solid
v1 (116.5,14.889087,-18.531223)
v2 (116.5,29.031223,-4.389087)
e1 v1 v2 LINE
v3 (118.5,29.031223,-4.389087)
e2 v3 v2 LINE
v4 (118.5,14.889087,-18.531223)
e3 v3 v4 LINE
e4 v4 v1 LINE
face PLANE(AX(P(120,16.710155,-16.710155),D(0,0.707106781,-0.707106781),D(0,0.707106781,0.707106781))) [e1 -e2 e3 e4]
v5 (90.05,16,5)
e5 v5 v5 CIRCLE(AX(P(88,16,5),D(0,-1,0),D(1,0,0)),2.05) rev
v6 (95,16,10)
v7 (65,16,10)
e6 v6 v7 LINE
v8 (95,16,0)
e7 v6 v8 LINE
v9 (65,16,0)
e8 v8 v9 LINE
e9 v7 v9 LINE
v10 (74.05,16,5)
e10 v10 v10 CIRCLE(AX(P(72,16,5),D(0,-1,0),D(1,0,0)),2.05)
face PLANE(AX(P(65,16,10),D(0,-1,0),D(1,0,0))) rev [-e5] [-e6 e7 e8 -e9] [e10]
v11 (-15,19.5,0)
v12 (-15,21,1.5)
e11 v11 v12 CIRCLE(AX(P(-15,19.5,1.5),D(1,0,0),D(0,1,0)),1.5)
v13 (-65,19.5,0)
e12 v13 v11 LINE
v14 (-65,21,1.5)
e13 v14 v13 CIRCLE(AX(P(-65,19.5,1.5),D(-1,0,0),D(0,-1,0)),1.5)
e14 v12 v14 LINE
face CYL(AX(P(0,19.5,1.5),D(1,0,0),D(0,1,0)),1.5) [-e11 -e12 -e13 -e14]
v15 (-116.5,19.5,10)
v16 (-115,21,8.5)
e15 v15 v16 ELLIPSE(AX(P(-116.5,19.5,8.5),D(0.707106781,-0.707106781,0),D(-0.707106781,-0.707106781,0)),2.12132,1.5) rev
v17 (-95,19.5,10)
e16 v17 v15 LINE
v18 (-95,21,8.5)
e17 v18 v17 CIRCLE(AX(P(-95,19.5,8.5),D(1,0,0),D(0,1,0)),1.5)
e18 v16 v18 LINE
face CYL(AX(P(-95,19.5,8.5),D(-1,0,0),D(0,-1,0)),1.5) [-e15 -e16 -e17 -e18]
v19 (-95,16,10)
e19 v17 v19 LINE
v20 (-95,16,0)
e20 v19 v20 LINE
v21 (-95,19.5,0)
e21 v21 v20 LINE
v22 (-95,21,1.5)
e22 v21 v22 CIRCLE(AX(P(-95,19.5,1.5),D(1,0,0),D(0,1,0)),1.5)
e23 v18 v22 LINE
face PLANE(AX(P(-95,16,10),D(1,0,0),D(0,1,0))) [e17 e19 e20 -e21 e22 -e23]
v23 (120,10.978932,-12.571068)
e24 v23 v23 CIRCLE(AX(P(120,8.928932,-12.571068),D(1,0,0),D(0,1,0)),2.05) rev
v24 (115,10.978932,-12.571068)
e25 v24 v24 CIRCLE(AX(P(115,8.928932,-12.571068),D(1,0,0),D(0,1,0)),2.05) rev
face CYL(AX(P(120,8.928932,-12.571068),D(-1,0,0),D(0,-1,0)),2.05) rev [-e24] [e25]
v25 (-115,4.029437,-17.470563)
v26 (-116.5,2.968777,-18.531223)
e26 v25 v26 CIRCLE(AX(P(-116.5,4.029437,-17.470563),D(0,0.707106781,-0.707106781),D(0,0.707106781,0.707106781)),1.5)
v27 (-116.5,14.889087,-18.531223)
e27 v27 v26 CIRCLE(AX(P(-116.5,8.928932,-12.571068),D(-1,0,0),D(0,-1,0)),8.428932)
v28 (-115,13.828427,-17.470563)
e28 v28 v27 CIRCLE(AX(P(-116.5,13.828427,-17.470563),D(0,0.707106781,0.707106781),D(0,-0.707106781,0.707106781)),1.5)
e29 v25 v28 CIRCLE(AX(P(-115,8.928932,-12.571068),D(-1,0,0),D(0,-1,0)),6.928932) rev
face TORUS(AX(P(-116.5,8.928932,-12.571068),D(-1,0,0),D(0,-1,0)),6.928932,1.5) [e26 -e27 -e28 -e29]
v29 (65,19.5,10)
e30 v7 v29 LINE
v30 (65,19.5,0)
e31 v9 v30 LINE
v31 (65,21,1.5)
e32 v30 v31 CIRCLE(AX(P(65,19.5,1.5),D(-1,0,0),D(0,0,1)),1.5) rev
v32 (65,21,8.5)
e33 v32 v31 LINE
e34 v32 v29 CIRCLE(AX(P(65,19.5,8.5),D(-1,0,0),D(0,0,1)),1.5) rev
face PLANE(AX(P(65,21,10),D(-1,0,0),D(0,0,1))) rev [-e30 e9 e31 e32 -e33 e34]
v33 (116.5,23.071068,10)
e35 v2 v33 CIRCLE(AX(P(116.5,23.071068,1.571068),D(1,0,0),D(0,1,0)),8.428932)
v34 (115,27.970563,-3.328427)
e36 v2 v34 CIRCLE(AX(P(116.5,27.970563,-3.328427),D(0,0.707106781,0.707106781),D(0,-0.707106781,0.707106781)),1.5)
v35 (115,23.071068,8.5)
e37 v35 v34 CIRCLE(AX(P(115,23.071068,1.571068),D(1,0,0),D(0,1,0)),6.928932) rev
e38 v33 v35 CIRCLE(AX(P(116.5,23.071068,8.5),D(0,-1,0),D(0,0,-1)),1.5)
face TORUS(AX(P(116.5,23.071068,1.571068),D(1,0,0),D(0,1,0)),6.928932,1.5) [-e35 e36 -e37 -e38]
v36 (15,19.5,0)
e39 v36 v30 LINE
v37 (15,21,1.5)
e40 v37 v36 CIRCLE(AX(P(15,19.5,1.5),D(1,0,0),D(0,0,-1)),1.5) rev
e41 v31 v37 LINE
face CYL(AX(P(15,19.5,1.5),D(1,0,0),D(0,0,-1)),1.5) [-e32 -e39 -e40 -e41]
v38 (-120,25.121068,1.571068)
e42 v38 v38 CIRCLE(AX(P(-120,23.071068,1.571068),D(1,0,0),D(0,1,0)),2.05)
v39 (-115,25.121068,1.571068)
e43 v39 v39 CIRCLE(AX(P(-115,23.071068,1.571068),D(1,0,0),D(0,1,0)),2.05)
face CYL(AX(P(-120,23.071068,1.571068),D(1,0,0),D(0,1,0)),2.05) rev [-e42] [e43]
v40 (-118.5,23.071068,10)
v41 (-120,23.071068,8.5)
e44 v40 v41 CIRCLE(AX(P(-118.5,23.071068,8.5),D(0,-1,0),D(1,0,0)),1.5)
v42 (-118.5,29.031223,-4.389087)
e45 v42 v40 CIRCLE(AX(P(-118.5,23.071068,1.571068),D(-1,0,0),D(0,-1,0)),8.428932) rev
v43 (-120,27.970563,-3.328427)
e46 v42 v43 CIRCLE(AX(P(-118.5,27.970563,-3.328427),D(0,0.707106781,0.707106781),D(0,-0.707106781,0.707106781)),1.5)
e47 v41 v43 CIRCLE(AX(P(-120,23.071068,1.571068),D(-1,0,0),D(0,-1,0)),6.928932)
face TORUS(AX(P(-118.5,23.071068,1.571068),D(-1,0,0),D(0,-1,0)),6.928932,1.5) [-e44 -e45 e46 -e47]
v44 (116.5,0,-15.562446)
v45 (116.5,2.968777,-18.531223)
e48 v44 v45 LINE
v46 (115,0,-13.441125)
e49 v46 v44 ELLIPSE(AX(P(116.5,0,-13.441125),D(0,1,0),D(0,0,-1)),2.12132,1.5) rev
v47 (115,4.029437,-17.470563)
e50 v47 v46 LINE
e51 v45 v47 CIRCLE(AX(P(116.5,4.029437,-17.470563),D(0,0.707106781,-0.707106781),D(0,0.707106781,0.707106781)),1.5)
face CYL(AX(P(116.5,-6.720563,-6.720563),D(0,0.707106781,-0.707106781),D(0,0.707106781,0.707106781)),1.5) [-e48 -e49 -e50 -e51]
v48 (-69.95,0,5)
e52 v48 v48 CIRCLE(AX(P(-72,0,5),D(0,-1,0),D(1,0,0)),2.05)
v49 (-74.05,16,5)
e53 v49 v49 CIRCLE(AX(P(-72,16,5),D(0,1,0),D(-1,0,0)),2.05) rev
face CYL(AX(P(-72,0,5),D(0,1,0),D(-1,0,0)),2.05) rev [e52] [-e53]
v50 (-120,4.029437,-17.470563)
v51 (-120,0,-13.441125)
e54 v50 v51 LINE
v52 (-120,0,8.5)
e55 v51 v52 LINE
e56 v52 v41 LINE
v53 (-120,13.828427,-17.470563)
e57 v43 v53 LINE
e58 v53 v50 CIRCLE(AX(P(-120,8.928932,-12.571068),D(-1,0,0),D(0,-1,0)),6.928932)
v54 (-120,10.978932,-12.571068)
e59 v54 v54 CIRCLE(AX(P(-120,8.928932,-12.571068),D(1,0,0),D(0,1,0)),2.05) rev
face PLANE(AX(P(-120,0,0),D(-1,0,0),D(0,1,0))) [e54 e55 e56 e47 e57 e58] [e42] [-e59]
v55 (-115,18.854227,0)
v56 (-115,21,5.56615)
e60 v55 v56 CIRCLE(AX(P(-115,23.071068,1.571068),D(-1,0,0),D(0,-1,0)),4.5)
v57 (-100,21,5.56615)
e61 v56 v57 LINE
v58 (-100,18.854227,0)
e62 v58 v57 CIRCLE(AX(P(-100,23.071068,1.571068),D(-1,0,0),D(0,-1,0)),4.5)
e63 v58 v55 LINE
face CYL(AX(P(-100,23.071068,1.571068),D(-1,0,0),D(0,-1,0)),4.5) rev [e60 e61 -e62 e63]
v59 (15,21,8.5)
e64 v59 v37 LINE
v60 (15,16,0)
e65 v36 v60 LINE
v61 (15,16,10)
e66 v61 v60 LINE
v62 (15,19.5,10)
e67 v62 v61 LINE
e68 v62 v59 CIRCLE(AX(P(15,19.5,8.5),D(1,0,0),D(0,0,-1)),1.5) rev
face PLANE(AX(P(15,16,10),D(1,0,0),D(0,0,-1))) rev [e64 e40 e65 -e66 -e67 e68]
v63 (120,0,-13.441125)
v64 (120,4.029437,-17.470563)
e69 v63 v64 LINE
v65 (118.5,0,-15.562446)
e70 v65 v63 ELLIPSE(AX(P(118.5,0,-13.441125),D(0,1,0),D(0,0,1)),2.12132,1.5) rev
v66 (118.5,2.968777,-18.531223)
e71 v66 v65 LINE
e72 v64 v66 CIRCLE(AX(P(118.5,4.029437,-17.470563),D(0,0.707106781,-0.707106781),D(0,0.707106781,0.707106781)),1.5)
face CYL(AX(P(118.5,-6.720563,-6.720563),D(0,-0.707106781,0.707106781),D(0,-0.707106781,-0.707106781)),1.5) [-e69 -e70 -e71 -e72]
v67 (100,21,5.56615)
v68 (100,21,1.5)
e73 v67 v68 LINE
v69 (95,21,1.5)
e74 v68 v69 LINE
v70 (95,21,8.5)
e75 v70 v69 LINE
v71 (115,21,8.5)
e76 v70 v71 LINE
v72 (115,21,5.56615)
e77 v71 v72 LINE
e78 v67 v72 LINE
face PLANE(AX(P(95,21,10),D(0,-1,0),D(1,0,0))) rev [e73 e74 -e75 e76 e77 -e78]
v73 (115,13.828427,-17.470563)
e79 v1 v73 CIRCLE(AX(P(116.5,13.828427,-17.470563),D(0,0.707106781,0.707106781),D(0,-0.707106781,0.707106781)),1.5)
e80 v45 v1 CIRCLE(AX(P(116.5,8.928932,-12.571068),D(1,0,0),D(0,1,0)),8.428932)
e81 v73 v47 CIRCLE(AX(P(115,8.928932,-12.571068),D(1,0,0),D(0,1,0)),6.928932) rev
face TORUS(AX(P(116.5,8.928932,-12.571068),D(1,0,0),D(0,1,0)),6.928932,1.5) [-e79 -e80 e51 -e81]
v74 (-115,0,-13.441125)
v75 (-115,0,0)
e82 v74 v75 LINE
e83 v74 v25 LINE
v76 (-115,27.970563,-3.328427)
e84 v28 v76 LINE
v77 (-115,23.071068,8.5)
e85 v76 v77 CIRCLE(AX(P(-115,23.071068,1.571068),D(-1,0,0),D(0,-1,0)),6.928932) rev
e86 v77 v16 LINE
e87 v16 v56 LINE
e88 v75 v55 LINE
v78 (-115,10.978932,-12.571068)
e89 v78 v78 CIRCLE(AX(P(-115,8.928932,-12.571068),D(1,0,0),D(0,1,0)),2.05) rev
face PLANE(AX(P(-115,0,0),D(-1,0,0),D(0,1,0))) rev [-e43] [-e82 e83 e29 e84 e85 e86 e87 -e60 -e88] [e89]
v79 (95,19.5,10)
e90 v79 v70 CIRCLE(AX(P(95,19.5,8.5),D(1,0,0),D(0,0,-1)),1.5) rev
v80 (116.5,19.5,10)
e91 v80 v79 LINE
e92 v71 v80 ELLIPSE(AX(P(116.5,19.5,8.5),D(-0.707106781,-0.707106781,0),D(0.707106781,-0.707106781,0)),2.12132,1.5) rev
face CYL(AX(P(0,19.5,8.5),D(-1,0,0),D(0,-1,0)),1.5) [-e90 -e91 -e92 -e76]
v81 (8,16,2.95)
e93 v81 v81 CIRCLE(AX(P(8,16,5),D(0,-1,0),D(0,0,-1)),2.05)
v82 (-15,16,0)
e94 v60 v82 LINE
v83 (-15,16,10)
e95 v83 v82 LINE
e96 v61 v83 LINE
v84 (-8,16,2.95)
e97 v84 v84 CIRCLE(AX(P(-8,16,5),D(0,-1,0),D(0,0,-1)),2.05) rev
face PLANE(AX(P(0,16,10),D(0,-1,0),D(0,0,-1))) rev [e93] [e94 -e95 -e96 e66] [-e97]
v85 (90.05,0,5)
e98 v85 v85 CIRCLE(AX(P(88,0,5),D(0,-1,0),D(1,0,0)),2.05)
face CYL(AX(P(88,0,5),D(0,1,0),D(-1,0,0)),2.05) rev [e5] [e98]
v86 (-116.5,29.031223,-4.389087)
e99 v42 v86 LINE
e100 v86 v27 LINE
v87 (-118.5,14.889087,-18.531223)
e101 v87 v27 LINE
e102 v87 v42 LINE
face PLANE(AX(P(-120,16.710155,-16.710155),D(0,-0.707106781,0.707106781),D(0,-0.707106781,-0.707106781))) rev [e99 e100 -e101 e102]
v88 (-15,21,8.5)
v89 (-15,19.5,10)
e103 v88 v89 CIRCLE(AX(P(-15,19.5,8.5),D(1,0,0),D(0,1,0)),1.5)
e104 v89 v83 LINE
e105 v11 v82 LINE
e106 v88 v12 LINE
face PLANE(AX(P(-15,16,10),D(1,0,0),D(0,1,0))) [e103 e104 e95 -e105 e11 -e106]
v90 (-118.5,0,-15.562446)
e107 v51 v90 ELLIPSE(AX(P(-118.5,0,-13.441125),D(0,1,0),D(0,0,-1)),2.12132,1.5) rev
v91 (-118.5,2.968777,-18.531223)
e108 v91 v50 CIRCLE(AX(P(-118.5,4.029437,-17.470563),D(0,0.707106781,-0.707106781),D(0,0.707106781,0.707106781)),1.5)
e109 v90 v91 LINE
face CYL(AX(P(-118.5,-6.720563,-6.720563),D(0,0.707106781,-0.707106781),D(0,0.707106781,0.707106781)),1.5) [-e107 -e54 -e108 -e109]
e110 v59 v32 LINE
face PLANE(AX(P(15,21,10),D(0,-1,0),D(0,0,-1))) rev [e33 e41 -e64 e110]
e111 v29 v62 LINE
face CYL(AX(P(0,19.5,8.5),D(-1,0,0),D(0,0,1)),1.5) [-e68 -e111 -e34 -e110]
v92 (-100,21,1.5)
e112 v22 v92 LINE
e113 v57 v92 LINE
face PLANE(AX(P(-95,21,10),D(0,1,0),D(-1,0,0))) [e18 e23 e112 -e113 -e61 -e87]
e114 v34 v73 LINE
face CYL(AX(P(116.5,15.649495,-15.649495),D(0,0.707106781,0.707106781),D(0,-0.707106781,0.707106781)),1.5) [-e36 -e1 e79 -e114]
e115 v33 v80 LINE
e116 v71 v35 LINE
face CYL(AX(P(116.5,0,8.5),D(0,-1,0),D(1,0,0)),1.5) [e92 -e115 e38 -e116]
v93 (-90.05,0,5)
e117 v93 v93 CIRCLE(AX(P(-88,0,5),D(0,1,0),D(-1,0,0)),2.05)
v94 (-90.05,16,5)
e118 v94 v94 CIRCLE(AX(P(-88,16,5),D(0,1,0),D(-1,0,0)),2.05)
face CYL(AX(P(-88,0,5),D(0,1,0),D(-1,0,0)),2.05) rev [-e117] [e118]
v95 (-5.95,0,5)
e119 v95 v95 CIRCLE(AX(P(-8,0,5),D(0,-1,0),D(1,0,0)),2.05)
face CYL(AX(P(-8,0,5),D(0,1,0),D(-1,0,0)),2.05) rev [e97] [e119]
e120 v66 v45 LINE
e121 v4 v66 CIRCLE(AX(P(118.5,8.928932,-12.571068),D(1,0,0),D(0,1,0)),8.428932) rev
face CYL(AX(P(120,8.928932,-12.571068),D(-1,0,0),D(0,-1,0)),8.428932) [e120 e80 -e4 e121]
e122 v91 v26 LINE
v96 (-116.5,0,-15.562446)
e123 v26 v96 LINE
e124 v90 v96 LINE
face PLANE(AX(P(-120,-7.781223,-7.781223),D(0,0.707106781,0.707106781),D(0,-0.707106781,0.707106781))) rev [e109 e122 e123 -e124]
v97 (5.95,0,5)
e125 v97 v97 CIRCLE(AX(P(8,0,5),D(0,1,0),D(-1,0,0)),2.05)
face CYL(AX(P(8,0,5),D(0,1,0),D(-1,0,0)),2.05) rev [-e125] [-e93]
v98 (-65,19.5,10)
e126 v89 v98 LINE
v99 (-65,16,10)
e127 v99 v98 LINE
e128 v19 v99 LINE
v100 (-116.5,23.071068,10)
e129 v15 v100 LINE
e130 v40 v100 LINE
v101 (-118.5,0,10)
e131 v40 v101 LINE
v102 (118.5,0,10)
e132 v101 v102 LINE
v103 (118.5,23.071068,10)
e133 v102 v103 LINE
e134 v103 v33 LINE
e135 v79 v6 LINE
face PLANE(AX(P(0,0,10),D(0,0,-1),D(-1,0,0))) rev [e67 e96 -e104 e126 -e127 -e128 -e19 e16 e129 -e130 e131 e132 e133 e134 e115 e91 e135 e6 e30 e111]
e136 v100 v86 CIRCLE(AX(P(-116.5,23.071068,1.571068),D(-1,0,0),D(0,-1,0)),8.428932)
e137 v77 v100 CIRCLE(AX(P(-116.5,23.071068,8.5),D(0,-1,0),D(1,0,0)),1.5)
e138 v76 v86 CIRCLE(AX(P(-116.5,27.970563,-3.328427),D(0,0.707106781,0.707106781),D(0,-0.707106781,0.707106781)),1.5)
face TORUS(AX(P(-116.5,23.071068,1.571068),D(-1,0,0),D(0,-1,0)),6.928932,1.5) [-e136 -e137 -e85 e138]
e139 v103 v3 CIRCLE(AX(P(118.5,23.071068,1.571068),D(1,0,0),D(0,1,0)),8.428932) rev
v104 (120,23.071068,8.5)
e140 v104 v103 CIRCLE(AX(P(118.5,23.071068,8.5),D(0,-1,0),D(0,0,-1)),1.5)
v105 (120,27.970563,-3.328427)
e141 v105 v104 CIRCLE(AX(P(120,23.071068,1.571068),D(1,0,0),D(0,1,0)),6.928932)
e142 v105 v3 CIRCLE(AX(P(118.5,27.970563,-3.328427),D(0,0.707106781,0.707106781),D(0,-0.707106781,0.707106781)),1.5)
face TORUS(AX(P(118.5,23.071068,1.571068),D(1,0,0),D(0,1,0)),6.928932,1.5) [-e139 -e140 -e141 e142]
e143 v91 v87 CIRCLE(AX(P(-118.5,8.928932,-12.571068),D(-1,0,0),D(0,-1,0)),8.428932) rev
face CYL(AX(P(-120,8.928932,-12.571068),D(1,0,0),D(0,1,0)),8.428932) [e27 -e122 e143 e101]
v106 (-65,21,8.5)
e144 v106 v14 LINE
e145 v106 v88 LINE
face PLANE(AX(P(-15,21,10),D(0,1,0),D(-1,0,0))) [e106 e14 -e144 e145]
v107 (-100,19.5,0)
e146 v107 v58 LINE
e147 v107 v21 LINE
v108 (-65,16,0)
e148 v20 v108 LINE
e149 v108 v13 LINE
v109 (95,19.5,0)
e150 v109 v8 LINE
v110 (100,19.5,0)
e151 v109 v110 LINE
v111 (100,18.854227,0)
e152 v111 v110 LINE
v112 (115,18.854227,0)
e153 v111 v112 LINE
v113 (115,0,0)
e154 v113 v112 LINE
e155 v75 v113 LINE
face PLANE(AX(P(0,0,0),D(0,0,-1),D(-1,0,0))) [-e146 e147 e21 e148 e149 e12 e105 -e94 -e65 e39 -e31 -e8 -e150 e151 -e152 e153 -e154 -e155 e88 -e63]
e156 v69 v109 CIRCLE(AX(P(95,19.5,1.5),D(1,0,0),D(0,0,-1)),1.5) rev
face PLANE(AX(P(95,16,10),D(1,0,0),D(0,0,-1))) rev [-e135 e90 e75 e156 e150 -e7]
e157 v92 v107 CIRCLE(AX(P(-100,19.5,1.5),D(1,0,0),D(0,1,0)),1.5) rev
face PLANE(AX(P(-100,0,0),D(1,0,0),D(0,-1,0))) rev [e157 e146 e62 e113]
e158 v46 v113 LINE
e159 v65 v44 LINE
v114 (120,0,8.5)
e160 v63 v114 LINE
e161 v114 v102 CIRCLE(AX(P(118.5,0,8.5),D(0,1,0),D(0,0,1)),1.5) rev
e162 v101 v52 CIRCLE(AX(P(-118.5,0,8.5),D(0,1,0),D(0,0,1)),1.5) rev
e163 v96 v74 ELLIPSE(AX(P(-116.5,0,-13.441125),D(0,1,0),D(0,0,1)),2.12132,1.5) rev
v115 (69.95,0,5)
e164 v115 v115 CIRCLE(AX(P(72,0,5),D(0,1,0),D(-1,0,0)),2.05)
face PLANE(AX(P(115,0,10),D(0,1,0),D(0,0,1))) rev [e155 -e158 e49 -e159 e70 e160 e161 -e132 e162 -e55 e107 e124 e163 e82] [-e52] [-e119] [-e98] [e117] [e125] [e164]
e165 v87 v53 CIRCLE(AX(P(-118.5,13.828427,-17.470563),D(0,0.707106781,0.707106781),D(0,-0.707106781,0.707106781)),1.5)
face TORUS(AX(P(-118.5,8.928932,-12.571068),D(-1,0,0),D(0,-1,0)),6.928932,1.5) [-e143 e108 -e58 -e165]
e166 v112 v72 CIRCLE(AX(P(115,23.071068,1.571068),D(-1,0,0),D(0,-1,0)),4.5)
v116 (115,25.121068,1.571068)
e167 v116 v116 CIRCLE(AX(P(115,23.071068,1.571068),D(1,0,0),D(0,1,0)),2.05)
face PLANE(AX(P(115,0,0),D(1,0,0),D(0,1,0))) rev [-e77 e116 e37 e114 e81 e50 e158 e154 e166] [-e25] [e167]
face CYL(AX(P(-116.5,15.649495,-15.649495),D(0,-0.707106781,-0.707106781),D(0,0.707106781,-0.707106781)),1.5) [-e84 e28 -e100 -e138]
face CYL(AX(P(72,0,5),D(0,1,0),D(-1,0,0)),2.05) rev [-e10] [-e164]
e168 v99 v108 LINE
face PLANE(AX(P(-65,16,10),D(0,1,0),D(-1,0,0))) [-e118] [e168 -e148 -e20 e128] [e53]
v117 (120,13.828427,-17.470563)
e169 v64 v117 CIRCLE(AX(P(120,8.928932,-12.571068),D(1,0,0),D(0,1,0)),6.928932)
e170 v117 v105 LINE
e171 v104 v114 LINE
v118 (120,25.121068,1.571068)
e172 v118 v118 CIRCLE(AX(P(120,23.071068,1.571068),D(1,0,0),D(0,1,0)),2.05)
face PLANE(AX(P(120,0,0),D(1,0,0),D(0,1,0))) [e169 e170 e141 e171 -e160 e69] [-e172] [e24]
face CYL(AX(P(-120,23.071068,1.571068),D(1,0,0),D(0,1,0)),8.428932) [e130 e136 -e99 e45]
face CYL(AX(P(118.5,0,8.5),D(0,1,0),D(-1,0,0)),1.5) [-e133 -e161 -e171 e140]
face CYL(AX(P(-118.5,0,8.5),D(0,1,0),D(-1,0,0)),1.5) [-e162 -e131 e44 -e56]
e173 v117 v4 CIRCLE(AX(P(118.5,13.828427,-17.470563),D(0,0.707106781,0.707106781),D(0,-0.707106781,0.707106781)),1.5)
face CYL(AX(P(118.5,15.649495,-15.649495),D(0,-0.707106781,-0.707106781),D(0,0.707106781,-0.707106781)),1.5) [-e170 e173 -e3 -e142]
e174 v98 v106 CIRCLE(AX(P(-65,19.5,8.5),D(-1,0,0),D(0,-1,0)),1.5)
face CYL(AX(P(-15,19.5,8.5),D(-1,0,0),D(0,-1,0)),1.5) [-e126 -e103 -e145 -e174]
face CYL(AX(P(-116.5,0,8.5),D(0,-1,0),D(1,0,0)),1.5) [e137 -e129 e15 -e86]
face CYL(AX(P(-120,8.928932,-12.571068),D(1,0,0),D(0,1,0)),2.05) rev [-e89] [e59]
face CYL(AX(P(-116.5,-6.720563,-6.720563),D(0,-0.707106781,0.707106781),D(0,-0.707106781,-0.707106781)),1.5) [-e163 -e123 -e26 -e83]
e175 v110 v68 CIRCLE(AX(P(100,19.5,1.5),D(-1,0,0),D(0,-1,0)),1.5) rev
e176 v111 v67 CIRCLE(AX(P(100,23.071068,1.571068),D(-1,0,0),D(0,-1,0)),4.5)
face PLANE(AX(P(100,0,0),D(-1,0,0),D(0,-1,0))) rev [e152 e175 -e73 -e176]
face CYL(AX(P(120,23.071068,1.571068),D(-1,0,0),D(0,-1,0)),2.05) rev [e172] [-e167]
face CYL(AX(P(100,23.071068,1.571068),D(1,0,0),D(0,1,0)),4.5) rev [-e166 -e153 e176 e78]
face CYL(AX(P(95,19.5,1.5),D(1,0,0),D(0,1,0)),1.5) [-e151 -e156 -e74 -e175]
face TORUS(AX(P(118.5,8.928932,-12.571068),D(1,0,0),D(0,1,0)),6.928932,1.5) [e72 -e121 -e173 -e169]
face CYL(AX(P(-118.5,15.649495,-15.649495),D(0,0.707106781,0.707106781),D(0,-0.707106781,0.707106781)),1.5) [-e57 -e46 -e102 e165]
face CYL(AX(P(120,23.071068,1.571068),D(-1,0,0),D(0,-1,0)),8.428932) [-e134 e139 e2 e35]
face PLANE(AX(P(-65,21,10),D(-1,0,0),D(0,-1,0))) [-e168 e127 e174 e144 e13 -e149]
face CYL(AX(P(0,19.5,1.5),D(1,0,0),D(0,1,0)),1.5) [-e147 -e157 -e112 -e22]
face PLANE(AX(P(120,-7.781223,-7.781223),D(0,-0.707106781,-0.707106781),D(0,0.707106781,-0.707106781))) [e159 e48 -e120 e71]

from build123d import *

# Parameters (mm, degrees)
BOSS_EXTRU_1_DEPTH      = 10
ESQUISSE6_R             = 2.05
ESQUISSE6_W             = 10
ESQUISSE6_H             = 21
BOSS_EXTRU_3_DEPTH      = 5
ESQUISSE4_R             = 2.05
ENL_V_MAT_EXTRU_2_DEPTH = 123.869849841
CONG_1_R                = 1.5
ESQUISSE8_R             = 2.05
ENL_V_MAT_EXTRU_4_DEPTH = 15


# Read off the part's stored shape, not the designer's step: Symétrie9
with BuildPart() as part:
    # Esquisse2 → Boss.-Extru.1 (new body)
    with BuildSketch(Plane.XY):
        Polygon((0, 0), (0, 16), (15, 16), (15, 21), (65, 21), (65, 16), (95, 16), (95, 21), (115, 21), (115, 0), align=None)
    extrude(amount=BOSS_EXTRU_1_DEPTH)

    # Esquisse6 → Boss.-Extru.3 (add)
    # profile 1 of 2: a face of its own
    with BuildSketch(Plane(origin=(115, 0, 0), x_dir=(0, 0, -1), z_dir=(1, 0, 0))):
        with BuildLine():
            Line((15.562445841, 0), (18.53122292, 2.96877708))
            ThreePointArc((18.53122292, 2.96877708), (21, 8.928932188), (18.53122292, 14.889087297))
            Line((18.53122292, 14.889087297), (4.389087297, 29.03122292))
            ThreePointArc((4.389087297, 29.03122292), (-4.796680513, 30.858385741), (-10, 23.071067812))
            Line((-10, 23.071067812), (-10, 21))
            Line((-10, 21), (0, 21))
            Line((0, 21), (0, 0))
            Line((0, 0), (15.562445841, 0))
        make_face()
        with Locations(Location((12.571067812, 8.928932188, 0), (0, 0, 90))):
            Circle(ESQUISSE6_R, mode=Mode.SUBTRACT)
        with Locations(Location((-1.571067812, 23.071067812, 0), (0, 0, 90))):
            Circle(ESQUISSE6_R, mode=Mode.SUBTRACT)
    # profile 2 of 2: a face of its own
    with BuildSketch(Plane(origin=(115, 0, 0), x_dir=(0, 0, -1), z_dir=(1, 0, 0))):
        with Locations((-5, 10.5)):
            Rectangle(ESQUISSE6_W, ESQUISSE6_H)
    extrude(amount=BOSS_EXTRU_3_DEPTH)

    # Esquisse4 → Enlèv. mat.-Extru.2 (cut, symmetric)
    with BuildSketch(Plane(origin=(0, 16, 0), x_dir=(1, 0, 0), z_dir=(0, 1, 0))):
        with Locations(Location((8, -5, 0), (0, 0, 180))):
            Circle(ESQUISSE4_R)
        with Locations(Location((72, -5, 0), (0, 0, 180))):
            Circle(ESQUISSE4_R)
        with Locations((88, -5)):
            Circle(ESQUISSE4_R)
    extrude(amount=ENL_V_MAT_EXTRU_2_DEPTH, both=True, mode=Mode.SUBTRACT)

    # Congé1
    cong_1_edges = [part.edges().sort_by_distance(p)[0] for p in [
        (40, 21, 0),
        (105, 21, 10),
        (105, 21, 0),
        (40, 21, 10),
        (115, 21.960155108, -11.460155108),
        (115, 8.928932188, -21),
        (115, 1.48438854, -17.04683438),
        (115, 22.035533906, 10),
        (120, 1.48438854, -17.04683438),
        (120, 8.928932188, -21),
        (120, 21.960155108, -11.460155108),
        (115, 30.858385741, 4.796680513),
        (120, 11.535533906, 10),
        (120, 30.858385741, 4.796680513),
    ]]
    fillet(cong_1_edges, radius=CONG_1_R)

    # Esquisse8 → Enlèv. mat.-Extru.4 (cut)
    # profile 1 of 2: a face of its own
    with BuildSketch(Plane.ZY.offset(-115)):
        with BuildLine():
            ThreePointArc((0, 19.5), (0.439339828, 20.560660172), (1.5, 21))
            Line((1.5, 21), (5.566149553, 21))
            ThreePointArc((5.566149553, 21), (5.943016338, 22.005203804), (6.071067812, 23.071067812))
            ThreePointArc((6.071067812, 23.071067812), (-0.996050694, 26.766998355), (0, 18.85422706))
            Line((0, 18.85422706), (0, 19.5))
        make_face()
        with Locations(Location((1.571067812, 23.071067812, 0), (0, 0, 90))):
            Circle(ESQUISSE8_R, mode=Mode.SUBTRACT)
    # profile 2 of 2: a face of its own
    with BuildSketch(Plane.ZY.offset(-115)):
        with BuildLine():
            Line((5.566149553, 21), (1.5, 21))
            ThreePointArc((1.5, 21), (0.439339828, 20.560660172), (0, 19.5))
            Line((0, 19.5), (0, 18.85422706))
            ThreePointArc((0, 18.85422706), (3.189723507, 18.872263966), (5.566149553, 21))
        make_face()
    extrude(amount=ENL_V_MAT_EXTRU_4_DEPTH, mode=Mode.SUBTRACT)

    # Symétrie9: part across plane


with BuildPart() as part_1:
    add(part.part)
    add(part.part.mirror(Plane(origin=(0, 0, 10), x_dir=(0, 0, 1), z_dir=(1, 0, 0))))


solid = part_1.part
